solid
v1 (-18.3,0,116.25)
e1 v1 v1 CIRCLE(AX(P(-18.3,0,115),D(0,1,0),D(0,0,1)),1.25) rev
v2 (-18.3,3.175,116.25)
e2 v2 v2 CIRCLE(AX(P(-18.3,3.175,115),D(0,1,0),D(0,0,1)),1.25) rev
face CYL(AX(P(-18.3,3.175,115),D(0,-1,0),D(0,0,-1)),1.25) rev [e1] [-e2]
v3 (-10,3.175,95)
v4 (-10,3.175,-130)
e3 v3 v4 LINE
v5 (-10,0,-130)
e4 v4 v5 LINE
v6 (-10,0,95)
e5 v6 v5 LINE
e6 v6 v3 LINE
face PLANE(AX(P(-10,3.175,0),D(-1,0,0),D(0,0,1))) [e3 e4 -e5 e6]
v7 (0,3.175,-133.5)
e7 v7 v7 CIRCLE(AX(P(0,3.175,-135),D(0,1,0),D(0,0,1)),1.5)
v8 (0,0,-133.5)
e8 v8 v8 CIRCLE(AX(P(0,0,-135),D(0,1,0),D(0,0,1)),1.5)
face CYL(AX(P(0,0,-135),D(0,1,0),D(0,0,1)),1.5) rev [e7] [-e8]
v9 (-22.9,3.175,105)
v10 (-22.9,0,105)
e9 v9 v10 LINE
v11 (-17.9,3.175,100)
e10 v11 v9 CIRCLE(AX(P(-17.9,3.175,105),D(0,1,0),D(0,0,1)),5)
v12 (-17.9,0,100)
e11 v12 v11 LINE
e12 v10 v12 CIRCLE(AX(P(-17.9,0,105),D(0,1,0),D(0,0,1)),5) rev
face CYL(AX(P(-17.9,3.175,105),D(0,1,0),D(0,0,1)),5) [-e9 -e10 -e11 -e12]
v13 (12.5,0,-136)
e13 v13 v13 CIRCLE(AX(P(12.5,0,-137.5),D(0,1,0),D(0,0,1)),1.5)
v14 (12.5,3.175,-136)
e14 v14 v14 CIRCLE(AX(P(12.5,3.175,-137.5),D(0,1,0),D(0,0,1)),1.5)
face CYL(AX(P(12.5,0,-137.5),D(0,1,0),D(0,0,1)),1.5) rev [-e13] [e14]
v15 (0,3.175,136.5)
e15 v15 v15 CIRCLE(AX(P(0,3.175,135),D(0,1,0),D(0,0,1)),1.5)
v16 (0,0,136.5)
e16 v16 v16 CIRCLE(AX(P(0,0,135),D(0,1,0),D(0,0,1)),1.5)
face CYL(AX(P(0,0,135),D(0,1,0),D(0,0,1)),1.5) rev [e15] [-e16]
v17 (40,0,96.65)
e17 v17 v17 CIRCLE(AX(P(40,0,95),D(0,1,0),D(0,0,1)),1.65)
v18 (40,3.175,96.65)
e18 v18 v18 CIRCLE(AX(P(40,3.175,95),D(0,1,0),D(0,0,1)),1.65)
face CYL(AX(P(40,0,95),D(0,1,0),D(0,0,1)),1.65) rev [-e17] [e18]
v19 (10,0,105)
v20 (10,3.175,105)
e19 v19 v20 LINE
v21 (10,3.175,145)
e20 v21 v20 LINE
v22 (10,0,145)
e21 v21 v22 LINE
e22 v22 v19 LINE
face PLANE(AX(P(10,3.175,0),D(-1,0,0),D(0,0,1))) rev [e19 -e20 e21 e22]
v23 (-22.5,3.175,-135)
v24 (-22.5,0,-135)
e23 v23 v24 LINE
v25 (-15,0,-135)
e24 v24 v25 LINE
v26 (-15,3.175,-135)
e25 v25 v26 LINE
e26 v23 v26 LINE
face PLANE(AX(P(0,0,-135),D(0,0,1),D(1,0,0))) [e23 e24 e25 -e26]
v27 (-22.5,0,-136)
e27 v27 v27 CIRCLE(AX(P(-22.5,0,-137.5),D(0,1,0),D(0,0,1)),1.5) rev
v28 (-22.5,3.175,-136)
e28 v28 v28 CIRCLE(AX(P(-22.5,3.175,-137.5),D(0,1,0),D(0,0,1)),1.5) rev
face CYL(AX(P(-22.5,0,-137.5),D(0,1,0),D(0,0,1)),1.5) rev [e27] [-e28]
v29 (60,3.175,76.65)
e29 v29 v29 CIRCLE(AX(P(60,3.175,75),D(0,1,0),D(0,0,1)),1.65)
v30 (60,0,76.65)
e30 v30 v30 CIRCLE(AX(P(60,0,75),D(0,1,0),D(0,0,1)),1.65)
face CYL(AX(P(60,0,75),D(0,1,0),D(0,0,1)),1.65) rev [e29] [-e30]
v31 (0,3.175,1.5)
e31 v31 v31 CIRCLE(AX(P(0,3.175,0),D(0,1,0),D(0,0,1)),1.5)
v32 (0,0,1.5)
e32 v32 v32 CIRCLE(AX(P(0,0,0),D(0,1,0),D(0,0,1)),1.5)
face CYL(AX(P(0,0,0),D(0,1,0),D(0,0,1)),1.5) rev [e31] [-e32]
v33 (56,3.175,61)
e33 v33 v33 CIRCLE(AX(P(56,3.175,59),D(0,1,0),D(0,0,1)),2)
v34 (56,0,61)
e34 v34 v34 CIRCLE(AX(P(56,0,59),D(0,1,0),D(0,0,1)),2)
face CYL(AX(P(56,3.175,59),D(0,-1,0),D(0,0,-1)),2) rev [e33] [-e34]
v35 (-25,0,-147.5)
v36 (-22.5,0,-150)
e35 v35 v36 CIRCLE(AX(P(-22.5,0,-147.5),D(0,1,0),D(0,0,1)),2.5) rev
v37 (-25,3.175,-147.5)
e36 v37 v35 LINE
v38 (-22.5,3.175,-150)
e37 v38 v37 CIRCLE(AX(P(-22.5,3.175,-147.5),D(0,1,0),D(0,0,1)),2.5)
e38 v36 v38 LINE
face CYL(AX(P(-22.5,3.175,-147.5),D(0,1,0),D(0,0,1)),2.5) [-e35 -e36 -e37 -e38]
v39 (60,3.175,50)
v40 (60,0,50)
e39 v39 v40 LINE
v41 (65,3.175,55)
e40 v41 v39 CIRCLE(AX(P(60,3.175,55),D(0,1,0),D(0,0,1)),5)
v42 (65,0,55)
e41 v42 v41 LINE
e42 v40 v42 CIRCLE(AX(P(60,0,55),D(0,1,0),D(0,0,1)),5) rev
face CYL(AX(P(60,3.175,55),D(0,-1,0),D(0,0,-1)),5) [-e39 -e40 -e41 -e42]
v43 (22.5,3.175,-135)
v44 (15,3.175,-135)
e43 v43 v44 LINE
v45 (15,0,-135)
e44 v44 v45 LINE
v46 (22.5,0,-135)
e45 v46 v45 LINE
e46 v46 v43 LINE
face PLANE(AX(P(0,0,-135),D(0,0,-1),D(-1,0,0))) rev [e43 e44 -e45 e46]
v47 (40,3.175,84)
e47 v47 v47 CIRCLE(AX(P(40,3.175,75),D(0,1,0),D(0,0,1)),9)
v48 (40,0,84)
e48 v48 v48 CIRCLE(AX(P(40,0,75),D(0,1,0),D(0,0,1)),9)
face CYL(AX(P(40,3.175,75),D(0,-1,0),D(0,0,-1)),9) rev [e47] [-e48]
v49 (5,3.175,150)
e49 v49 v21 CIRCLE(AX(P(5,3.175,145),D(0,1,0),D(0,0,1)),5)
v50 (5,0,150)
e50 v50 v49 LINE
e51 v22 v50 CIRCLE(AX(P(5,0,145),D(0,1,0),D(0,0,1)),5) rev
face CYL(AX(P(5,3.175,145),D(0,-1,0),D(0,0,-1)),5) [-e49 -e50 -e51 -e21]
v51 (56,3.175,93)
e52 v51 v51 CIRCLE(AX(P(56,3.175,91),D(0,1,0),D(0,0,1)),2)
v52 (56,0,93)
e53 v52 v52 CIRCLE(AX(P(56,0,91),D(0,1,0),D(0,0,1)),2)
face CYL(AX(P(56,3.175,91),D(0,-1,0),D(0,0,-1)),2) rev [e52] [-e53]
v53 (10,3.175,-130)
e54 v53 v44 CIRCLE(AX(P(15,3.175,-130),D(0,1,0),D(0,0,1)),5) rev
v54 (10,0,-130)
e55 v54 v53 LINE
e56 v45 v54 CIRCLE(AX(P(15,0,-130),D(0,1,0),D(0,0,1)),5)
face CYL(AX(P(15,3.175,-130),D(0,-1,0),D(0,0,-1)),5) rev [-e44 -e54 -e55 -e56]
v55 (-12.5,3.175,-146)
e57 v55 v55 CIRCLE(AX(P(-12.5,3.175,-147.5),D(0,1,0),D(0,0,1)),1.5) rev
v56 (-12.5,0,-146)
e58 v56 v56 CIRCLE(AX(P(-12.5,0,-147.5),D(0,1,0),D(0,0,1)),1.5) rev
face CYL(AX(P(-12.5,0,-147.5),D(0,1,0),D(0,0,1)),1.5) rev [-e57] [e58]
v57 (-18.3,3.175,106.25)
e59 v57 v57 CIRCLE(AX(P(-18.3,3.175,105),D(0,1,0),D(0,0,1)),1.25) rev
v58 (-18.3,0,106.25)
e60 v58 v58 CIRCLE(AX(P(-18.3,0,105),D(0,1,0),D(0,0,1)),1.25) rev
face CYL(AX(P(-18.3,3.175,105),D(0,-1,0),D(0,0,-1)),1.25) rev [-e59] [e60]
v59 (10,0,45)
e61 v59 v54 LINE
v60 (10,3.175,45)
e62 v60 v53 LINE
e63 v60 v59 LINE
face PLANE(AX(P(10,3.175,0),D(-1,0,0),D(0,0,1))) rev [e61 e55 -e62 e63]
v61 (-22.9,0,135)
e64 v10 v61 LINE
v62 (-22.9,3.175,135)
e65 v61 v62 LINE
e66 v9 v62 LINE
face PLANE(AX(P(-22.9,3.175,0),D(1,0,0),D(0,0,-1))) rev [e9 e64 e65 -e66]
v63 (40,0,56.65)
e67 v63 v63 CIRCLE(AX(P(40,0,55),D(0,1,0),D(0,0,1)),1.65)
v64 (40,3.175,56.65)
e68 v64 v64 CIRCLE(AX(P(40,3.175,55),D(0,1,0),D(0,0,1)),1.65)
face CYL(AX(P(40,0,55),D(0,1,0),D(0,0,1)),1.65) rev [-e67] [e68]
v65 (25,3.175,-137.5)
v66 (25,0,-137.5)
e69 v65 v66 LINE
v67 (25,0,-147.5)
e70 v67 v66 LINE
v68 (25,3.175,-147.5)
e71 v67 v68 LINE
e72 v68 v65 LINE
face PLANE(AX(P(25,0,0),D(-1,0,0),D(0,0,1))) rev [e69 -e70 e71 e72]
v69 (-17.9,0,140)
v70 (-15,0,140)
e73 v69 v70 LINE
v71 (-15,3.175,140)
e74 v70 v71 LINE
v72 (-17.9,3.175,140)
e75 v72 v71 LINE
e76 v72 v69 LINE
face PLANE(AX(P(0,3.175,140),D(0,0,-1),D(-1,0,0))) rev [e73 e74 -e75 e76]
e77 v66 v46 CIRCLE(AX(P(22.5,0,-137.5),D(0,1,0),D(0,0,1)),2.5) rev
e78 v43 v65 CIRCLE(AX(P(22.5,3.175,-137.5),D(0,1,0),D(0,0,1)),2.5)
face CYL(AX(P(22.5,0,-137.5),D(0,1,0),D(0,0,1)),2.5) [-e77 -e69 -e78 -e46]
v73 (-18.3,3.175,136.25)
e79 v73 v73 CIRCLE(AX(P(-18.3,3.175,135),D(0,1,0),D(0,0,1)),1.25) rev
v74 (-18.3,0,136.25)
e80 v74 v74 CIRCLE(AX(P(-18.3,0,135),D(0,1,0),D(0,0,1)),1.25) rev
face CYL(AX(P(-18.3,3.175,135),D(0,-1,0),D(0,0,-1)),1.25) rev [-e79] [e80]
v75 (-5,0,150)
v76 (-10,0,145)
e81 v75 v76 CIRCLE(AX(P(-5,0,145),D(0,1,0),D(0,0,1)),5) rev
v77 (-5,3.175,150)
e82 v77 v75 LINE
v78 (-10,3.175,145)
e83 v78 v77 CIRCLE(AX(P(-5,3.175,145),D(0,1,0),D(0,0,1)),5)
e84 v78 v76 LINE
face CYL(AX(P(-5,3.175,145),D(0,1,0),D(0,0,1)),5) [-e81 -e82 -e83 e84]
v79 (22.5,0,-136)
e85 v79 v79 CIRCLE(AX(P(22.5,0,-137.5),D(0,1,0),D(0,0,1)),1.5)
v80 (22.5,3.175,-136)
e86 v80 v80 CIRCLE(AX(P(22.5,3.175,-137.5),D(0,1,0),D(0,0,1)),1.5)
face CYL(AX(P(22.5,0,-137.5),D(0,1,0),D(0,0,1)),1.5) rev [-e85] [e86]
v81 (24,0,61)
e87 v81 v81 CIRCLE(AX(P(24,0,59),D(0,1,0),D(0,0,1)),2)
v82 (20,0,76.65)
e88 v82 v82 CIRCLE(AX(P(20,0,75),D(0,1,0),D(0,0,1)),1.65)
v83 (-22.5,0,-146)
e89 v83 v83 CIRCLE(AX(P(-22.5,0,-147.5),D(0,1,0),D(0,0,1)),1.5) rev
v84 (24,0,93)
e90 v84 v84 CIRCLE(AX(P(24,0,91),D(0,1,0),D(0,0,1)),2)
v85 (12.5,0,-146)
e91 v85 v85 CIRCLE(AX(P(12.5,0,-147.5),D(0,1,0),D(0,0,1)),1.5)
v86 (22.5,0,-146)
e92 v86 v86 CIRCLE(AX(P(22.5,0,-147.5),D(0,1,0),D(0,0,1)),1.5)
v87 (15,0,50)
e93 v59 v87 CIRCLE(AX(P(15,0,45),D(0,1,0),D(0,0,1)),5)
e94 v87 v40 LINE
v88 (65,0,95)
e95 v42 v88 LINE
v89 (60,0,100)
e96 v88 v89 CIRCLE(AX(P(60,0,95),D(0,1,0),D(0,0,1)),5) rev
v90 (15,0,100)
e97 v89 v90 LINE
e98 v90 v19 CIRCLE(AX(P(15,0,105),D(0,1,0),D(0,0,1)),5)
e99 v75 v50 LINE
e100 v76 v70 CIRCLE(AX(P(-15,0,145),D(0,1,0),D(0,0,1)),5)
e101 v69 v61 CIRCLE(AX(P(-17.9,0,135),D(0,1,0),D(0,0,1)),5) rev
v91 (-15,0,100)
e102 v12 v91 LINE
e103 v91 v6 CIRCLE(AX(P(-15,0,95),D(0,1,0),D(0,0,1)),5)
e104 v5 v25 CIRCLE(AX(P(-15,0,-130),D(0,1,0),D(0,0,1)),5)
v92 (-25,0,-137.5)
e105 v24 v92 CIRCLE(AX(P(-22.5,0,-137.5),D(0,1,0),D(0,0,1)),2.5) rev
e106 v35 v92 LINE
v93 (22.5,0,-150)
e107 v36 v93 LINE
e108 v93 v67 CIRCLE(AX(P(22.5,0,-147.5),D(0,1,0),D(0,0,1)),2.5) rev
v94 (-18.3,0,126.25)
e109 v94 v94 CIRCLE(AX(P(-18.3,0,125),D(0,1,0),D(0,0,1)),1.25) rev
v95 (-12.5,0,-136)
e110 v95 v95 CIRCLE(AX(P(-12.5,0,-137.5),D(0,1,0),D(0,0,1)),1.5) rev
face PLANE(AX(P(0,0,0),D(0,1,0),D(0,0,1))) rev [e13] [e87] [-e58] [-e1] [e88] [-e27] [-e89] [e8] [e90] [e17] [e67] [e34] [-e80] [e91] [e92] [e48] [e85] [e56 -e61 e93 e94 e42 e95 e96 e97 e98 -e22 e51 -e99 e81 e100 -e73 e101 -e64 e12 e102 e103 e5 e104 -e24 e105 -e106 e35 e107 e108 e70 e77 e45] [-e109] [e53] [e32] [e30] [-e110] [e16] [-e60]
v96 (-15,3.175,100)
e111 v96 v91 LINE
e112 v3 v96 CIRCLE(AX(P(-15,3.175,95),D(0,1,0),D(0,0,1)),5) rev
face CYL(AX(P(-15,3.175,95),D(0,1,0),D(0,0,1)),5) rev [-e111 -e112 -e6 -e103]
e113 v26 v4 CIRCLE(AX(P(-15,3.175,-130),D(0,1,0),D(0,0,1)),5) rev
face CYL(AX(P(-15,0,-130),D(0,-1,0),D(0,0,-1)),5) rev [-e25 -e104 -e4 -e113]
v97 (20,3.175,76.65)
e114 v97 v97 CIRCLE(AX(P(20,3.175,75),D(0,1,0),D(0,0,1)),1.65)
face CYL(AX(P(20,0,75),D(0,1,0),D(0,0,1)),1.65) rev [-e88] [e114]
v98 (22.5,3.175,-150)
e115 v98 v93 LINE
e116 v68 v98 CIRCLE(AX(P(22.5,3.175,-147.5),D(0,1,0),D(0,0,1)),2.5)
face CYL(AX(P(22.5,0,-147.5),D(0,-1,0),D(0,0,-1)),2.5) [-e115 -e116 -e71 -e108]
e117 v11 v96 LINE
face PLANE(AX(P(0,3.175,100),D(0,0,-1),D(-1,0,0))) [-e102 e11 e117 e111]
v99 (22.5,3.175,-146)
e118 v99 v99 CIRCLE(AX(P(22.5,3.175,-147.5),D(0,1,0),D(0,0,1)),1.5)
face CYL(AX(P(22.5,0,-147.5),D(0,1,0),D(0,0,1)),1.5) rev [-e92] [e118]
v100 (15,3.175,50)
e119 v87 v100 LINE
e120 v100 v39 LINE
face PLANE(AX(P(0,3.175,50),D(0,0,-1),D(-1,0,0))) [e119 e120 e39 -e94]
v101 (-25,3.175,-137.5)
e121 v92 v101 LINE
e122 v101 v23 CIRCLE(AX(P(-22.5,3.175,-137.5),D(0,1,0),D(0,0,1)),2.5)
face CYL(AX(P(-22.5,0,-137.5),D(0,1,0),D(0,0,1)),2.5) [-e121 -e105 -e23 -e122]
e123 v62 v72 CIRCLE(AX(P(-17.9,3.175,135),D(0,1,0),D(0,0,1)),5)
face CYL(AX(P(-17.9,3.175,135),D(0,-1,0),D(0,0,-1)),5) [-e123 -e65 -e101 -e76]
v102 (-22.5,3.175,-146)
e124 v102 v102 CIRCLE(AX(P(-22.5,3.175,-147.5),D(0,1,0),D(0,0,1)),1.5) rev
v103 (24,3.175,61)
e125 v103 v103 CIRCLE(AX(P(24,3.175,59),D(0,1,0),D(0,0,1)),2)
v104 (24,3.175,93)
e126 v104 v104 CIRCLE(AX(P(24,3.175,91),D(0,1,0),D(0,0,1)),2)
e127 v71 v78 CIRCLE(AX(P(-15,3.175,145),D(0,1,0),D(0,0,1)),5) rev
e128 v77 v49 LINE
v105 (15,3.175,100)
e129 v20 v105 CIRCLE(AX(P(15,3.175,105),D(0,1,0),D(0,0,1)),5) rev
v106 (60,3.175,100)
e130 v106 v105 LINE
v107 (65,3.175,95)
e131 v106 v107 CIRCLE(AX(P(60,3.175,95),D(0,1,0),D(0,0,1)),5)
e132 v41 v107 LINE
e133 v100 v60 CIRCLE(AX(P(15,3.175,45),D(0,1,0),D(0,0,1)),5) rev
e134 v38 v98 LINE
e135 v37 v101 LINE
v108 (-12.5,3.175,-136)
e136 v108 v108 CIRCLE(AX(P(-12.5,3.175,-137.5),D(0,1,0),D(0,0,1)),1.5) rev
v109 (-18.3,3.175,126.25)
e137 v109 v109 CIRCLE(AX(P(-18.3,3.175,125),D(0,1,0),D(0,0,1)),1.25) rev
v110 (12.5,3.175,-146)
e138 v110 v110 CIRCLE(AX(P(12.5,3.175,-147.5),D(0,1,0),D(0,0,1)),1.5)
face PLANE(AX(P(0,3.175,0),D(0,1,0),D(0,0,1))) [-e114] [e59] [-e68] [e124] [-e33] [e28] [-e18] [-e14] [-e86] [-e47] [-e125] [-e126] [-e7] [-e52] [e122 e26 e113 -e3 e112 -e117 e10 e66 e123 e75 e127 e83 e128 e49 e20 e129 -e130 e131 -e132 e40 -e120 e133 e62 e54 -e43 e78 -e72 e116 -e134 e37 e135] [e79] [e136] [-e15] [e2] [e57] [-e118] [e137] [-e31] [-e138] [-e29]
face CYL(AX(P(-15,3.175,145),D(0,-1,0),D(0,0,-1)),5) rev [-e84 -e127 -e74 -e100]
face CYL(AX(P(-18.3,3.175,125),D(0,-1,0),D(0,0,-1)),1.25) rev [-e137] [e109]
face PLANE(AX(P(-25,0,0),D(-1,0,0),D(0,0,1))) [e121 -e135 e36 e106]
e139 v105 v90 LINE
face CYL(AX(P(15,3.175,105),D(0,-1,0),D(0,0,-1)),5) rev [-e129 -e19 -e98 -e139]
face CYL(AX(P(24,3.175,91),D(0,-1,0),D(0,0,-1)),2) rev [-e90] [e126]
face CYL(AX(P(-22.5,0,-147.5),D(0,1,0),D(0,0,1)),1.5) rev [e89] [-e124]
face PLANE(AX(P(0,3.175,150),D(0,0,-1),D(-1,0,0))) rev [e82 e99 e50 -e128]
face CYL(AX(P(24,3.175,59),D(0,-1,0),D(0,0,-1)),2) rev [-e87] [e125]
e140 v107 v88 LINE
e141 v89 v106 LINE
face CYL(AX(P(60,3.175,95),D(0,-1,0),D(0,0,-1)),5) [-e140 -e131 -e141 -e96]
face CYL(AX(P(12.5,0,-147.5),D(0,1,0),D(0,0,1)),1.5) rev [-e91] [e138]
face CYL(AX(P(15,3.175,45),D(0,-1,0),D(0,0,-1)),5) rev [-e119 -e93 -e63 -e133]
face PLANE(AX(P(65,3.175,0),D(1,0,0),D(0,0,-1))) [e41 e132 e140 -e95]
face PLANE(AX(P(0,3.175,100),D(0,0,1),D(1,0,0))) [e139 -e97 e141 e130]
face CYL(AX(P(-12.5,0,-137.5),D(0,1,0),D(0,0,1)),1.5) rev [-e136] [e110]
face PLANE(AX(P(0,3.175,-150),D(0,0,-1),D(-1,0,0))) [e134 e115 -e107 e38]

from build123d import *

# Parameters (mm, degrees)
SKETCH1_R           = 1.25
SKETCH1_R_2         = 2
SKETCH1_R_3         = 9
BOSS_EXTRUDE1_DEPTH = 3.175
SKETCH2_R           = 1.65
CUT_EXTRUDE1_DEPTH  = 164.508656116
SKETCH3_R           = 1.5
CUT_EXTRUDE2_DEPTH  = 164.508656116
SKETCH4_W           = 15
SKETCH4_H           = 15
SKETCH4_R           = 1.5
BOSS_EXTRUDE2_DEPTH = 3.175
FILLET1_DEPTH       = 3.175
FILLET1_2_DEPTH     = 3.175
FILLET2_R           = 2.5


with BuildPart() as part:
    # Sketch1 → Boss-Extrude1 (new body)
    with BuildSketch(Plane(origin=(0, 0, 0), x_dir=(1, 0, 0), z_dir=(0, 1, 0))):
        Polygon((65, -50), (10, -50), (10, 150), (-10, 150), (-10, -100), (-22.9, -100), (-22.9, -140), (-10, -140), (-10, -150), (0, -150), (10, -150), (10, -100), (65, -100), align=None)
        with Locations(Location((-18.3, -135, 0), (0, 0, 270))):
            Circle(SKETCH1_R, mode=Mode.SUBTRACT)
        with Locations(Location((-18.3, -125, 0), (0, 0, 270))):
            Circle(SKETCH1_R, mode=Mode.SUBTRACT)
        with Locations(Location((-18.3, -115, 0), (0, 0, 270))):
            Circle(SKETCH1_R, mode=Mode.SUBTRACT)
        with Locations(Location((-18.3, -105, 0), (0, 0, 270))):
            Circle(SKETCH1_R, mode=Mode.SUBTRACT)
        with Locations(Location((24, -59, 0), (0, 0, 270))):
            Circle(SKETCH1_R_2, mode=Mode.SUBTRACT)
        with Locations(Location((56, -59, 0), (0, 0, 270))):
            Circle(SKETCH1_R_2, mode=Mode.SUBTRACT)
        with Locations(Location((24, -91, 0), (0, 0, 270))):
            Circle(SKETCH1_R_2, mode=Mode.SUBTRACT)
        with Locations(Location((56, -91, 0), (0, 0, 270))):
            Circle(SKETCH1_R_2, mode=Mode.SUBTRACT)
        with Locations(Location((40, -75, 0), (0, 0, 270))):
            Circle(SKETCH1_R_3, mode=Mode.SUBTRACT)
    extrude(amount=BOSS_EXTRUDE1_DEPTH)

    # Sketch2 → Cut-Extrude1 (cut, through all)
    with BuildSketch(Plane(origin=(0, 3.175, 0), x_dir=(1, 0, 0), z_dir=(0, 1, 0))):
        with Locations(Location((40, -55, 0), (0, 0, 270))):
            Circle(SKETCH2_R)
        with Locations(Location((60, -75, 0), (0, 0, 270))):
            Circle(SKETCH2_R)
        with Locations(Location((40, -95, 0), (0, 0, 270))):
            Circle(SKETCH2_R)
        with Locations(Location((20, -75, 0), (0, 0, 270))):
            Circle(SKETCH2_R)
    extrude(amount=-CUT_EXTRUDE1_DEPTH, mode=Mode.SUBTRACT)

    # Sketch3 → Cut-Extrude2 (cut, through all)
    with BuildSketch(Plane(origin=(0, 3.175, 0), x_dir=(1, 0, 0), z_dir=(0, 1, 0))):
        with Locations(Location((0, 0, 0), (0, 0, 270))):
            Circle(SKETCH3_R)
        with Locations(Location((0, -135, 0), (0, 0, 270))):
            Circle(SKETCH3_R)
        with Locations(Location((0, 135, 0), (0, 0, 270))):
            Circle(SKETCH3_R)
    extrude(amount=-CUT_EXTRUDE2_DEPTH, mode=Mode.SUBTRACT)

    # Sketch4 → Boss-Extrude2 (add)
    # profile 1 of 5: a face of its own
    with BuildSketch(Plane(origin=(0, 3.175, 0), x_dir=(1, 0, 0), z_dir=(0, 1, 0))):
        with Locations((-17.5, 142.5)):
            Rectangle(SKETCH4_W, SKETCH4_H)
        with Locations(Location((-22.5, 137.5, 0), (0, 0, 270))):
            Circle(SKETCH4_R, mode=Mode.SUBTRACT)
        with Locations(Location((-12.5, 137.5, 0), (0, 0, 270))):
            Circle(SKETCH4_R, mode=Mode.SUBTRACT)
        with Locations(Location((-22.5, 147.5, 0), (0, 0, 270))):
            Circle(SKETCH4_R, mode=Mode.SUBTRACT)
        with Locations(Location((-12.5, 147.5, 0), (0, 0, 270))):
            Circle(SKETCH4_R, mode=Mode.SUBTRACT)
    # profile 2 of 5: a face of its own
    with BuildSketch(Plane(origin=(0, 3.175, 0), x_dir=(1, 0, 0), z_dir=(0, 1, 0))):
        with BuildLine():
            Line((17.5, 150), (10, 150))
            Line((10, 150), (10, 135))
            Line((10, 135), (17.5, 135))
            Line((17.5, 135), (17.5, 137.5))
            Line((17.5, 137.5), (14, 137.5))
            ThreePointArc((14, 137.5), (11.439339828, 136.439339828), (12.5, 139))
            Line((12.5, 139), (12.5, 146))
            ThreePointArc((12.5, 146), (11.439339828, 148.560660172), (14, 147.5))
            Line((14, 147.5), (17.5, 147.5))
            Line((17.5, 147.5), (17.5, 150))
        make_face()
    # profile 3 of 5: a face of its own
    with BuildSketch(Plane(origin=(0, 3.175, 0), x_dir=(1, 0, 0), z_dir=(0, 1, 0))):
        with BuildLine():
            Line((25, 150), (17.5, 150))
            Line((17.5, 150), (17.5, 147.5))
            Line((17.5, 147.5), (21, 147.5))
            ThreePointArc((21, 147.5), (22.5, 149), (24, 147.5))
            ThreePointArc((24, 147.5), (23.560660172, 146.439339828), (22.5, 146))
            Line((22.5, 146), (22.5, 139))
            ThreePointArc((22.5, 139), (23.560660172, 138.560660172), (24, 137.5))
            ThreePointArc((24, 137.5), (22.5, 136), (21, 137.5))
            Line((21, 137.5), (17.5, 137.5))
            Line((17.5, 137.5), (17.5, 135))
            Line((17.5, 135), (25, 135))
            Line((25, 135), (25, 150))
        make_face()
    # profile 4 of 5: a face of its own
    with BuildSketch(Plane(origin=(0, 3.175, 0), x_dir=(1, 0, 0), z_dir=(0, 1, 0))):
        with BuildLine():
            Line((21, 147.5), (17.5, 147.5))
            Line((17.5, 147.5), (17.5, 137.5))
            Line((17.5, 137.5), (21, 137.5))
            ThreePointArc((21, 137.5), (21.439339828, 138.560660172), (22.5, 139))
            Line((22.5, 139), (22.5, 146))
            ThreePointArc((22.5, 146), (21.439339828, 146.439339828), (21, 147.5))
        make_face()
    # profile 5 of 5: a face of its own
    with BuildSketch(Plane(origin=(0, 3.175, 0), x_dir=(1, 0, 0), z_dir=(0, 1, 0))):
        with BuildLine():
            Line((17.5, 137.5), (17.5, 147.5))
            Line((17.5, 147.5), (14, 147.5))
            ThreePointArc((14, 147.5), (13.560660172, 146.439339828), (12.5, 146))
            Line((12.5, 146), (12.5, 139))
            ThreePointArc((12.5, 139), (13.560660172, 138.560660172), (14, 137.5))
            Line((14, 137.5), (17.5, 137.5))
        make_face()
    extrude(amount=-BOSS_EXTRUDE2_DEPTH)

    # Fillet1: read off the stored shape, not the designer's step
    # Fillet1 outline → Fillet1 (cut)
    with BuildSketch(Plane(origin=(0, 0, 0), x_dir=(1, 0, 0), z_dir=(0, 1, 0))):
        with BuildLine():
            ThreePointArc((60, -50), (63.535533906, -51.464466094), (65, -55))
            Line((65, -55), (65, -50))
            Line((65, -50), (60, -50))
        make_face()
        with BuildLine():
            ThreePointArc((65, -95), (63.535533906, -98.535533906), (60, -100))
            Line((60, -100), (65, -100))
            Line((65, -100), (65, -95))
        make_face()
        with BuildLine():
            ThreePointArc((10, -145), (8.535533906, -148.535533906), (5, -150))
            Line((5, -150), (10, -150))
            Line((10, -150), (10, -145))
        make_face()
        with BuildLine():
            ThreePointArc((-5, -150), (-8.535533906, -148.535533906), (-10, -145))
            Line((-10, -145), (-10, -150))
            Line((-10, -150), (-5, -150))
        make_face()
        with BuildLine():
            ThreePointArc((-17.9, -140), (-21.435533906, -138.535533906), (-22.9, -135))
            Line((-22.9, -135), (-22.9, -140))
            Line((-22.9, -140), (-17.9, -140))
        make_face()
        with BuildLine():
            ThreePointArc((-22.9, -105), (-21.435533906, -101.464466094), (-17.9, -100))
            Line((-17.9, -100), (-22.9, -100))
            Line((-22.9, -100), (-22.9, -105))
        make_face()
    extrude(amount=FILLET1_DEPTH, mode=Mode.SUBTRACT)

    # Fillet1 2 outline → Fillet1 2 (add)
    with BuildSketch(Plane(origin=(0, 0, 0), x_dir=(1, 0, 0), z_dir=(0, 1, 0))):
        with BuildLine():
            Line((10, 135), (10, 130))
            ThreePointArc((10, 130), (11.464466094, 133.535533906), (15, 135))
            Line((15, 135), (10, 135))
        make_face()
        with BuildLine():
            Line((10, -50), (15, -50))
            ThreePointArc((15, -50), (11.464466094, -48.535533906), (10, -45))
            Line((10, -45), (10, -50))
        make_face()
        with BuildLine():
            Line((10, -100), (10, -105))
            ThreePointArc((10, -105), (11.464466094, -101.464466094), (15, -100))
            Line((15, -100), (10, -100))
        make_face()
        with BuildLine():
            Line((-10, -140), (-15, -140))
            ThreePointArc((-15, -140), (-11.464466094, -141.464466094), (-10, -145))
            Line((-10, -145), (-10, -140))
        make_face()
        with BuildLine():
            ThreePointArc((-15, 135), (-11.464466094, 133.535533906), (-10, 130))
            Line((-10, 130), (-10, 135))
            Line((-10, 135), (-15, 135))
        make_face()
        with BuildLine():
            ThreePointArc((-10, -95), (-11.464466094, -98.535533906), (-15, -100))
            Line((-15, -100), (-10, -100))
            Line((-10, -100), (-10, -95))
        make_face()
    extrude(amount=FILLET1_2_DEPTH)

    # Fillet2
    fillet2_edges = [part.edges().sort_by_distance(p)[0] for p in [
        (-25, 1.5875, -135),
        (-25, 1.5875, -150),
        (25, 1.5875, -150),
        (25, 1.5875, -135),
    ]]
    fillet(fillet2_edges, radius=FILLET2_R)


solid = part.part
